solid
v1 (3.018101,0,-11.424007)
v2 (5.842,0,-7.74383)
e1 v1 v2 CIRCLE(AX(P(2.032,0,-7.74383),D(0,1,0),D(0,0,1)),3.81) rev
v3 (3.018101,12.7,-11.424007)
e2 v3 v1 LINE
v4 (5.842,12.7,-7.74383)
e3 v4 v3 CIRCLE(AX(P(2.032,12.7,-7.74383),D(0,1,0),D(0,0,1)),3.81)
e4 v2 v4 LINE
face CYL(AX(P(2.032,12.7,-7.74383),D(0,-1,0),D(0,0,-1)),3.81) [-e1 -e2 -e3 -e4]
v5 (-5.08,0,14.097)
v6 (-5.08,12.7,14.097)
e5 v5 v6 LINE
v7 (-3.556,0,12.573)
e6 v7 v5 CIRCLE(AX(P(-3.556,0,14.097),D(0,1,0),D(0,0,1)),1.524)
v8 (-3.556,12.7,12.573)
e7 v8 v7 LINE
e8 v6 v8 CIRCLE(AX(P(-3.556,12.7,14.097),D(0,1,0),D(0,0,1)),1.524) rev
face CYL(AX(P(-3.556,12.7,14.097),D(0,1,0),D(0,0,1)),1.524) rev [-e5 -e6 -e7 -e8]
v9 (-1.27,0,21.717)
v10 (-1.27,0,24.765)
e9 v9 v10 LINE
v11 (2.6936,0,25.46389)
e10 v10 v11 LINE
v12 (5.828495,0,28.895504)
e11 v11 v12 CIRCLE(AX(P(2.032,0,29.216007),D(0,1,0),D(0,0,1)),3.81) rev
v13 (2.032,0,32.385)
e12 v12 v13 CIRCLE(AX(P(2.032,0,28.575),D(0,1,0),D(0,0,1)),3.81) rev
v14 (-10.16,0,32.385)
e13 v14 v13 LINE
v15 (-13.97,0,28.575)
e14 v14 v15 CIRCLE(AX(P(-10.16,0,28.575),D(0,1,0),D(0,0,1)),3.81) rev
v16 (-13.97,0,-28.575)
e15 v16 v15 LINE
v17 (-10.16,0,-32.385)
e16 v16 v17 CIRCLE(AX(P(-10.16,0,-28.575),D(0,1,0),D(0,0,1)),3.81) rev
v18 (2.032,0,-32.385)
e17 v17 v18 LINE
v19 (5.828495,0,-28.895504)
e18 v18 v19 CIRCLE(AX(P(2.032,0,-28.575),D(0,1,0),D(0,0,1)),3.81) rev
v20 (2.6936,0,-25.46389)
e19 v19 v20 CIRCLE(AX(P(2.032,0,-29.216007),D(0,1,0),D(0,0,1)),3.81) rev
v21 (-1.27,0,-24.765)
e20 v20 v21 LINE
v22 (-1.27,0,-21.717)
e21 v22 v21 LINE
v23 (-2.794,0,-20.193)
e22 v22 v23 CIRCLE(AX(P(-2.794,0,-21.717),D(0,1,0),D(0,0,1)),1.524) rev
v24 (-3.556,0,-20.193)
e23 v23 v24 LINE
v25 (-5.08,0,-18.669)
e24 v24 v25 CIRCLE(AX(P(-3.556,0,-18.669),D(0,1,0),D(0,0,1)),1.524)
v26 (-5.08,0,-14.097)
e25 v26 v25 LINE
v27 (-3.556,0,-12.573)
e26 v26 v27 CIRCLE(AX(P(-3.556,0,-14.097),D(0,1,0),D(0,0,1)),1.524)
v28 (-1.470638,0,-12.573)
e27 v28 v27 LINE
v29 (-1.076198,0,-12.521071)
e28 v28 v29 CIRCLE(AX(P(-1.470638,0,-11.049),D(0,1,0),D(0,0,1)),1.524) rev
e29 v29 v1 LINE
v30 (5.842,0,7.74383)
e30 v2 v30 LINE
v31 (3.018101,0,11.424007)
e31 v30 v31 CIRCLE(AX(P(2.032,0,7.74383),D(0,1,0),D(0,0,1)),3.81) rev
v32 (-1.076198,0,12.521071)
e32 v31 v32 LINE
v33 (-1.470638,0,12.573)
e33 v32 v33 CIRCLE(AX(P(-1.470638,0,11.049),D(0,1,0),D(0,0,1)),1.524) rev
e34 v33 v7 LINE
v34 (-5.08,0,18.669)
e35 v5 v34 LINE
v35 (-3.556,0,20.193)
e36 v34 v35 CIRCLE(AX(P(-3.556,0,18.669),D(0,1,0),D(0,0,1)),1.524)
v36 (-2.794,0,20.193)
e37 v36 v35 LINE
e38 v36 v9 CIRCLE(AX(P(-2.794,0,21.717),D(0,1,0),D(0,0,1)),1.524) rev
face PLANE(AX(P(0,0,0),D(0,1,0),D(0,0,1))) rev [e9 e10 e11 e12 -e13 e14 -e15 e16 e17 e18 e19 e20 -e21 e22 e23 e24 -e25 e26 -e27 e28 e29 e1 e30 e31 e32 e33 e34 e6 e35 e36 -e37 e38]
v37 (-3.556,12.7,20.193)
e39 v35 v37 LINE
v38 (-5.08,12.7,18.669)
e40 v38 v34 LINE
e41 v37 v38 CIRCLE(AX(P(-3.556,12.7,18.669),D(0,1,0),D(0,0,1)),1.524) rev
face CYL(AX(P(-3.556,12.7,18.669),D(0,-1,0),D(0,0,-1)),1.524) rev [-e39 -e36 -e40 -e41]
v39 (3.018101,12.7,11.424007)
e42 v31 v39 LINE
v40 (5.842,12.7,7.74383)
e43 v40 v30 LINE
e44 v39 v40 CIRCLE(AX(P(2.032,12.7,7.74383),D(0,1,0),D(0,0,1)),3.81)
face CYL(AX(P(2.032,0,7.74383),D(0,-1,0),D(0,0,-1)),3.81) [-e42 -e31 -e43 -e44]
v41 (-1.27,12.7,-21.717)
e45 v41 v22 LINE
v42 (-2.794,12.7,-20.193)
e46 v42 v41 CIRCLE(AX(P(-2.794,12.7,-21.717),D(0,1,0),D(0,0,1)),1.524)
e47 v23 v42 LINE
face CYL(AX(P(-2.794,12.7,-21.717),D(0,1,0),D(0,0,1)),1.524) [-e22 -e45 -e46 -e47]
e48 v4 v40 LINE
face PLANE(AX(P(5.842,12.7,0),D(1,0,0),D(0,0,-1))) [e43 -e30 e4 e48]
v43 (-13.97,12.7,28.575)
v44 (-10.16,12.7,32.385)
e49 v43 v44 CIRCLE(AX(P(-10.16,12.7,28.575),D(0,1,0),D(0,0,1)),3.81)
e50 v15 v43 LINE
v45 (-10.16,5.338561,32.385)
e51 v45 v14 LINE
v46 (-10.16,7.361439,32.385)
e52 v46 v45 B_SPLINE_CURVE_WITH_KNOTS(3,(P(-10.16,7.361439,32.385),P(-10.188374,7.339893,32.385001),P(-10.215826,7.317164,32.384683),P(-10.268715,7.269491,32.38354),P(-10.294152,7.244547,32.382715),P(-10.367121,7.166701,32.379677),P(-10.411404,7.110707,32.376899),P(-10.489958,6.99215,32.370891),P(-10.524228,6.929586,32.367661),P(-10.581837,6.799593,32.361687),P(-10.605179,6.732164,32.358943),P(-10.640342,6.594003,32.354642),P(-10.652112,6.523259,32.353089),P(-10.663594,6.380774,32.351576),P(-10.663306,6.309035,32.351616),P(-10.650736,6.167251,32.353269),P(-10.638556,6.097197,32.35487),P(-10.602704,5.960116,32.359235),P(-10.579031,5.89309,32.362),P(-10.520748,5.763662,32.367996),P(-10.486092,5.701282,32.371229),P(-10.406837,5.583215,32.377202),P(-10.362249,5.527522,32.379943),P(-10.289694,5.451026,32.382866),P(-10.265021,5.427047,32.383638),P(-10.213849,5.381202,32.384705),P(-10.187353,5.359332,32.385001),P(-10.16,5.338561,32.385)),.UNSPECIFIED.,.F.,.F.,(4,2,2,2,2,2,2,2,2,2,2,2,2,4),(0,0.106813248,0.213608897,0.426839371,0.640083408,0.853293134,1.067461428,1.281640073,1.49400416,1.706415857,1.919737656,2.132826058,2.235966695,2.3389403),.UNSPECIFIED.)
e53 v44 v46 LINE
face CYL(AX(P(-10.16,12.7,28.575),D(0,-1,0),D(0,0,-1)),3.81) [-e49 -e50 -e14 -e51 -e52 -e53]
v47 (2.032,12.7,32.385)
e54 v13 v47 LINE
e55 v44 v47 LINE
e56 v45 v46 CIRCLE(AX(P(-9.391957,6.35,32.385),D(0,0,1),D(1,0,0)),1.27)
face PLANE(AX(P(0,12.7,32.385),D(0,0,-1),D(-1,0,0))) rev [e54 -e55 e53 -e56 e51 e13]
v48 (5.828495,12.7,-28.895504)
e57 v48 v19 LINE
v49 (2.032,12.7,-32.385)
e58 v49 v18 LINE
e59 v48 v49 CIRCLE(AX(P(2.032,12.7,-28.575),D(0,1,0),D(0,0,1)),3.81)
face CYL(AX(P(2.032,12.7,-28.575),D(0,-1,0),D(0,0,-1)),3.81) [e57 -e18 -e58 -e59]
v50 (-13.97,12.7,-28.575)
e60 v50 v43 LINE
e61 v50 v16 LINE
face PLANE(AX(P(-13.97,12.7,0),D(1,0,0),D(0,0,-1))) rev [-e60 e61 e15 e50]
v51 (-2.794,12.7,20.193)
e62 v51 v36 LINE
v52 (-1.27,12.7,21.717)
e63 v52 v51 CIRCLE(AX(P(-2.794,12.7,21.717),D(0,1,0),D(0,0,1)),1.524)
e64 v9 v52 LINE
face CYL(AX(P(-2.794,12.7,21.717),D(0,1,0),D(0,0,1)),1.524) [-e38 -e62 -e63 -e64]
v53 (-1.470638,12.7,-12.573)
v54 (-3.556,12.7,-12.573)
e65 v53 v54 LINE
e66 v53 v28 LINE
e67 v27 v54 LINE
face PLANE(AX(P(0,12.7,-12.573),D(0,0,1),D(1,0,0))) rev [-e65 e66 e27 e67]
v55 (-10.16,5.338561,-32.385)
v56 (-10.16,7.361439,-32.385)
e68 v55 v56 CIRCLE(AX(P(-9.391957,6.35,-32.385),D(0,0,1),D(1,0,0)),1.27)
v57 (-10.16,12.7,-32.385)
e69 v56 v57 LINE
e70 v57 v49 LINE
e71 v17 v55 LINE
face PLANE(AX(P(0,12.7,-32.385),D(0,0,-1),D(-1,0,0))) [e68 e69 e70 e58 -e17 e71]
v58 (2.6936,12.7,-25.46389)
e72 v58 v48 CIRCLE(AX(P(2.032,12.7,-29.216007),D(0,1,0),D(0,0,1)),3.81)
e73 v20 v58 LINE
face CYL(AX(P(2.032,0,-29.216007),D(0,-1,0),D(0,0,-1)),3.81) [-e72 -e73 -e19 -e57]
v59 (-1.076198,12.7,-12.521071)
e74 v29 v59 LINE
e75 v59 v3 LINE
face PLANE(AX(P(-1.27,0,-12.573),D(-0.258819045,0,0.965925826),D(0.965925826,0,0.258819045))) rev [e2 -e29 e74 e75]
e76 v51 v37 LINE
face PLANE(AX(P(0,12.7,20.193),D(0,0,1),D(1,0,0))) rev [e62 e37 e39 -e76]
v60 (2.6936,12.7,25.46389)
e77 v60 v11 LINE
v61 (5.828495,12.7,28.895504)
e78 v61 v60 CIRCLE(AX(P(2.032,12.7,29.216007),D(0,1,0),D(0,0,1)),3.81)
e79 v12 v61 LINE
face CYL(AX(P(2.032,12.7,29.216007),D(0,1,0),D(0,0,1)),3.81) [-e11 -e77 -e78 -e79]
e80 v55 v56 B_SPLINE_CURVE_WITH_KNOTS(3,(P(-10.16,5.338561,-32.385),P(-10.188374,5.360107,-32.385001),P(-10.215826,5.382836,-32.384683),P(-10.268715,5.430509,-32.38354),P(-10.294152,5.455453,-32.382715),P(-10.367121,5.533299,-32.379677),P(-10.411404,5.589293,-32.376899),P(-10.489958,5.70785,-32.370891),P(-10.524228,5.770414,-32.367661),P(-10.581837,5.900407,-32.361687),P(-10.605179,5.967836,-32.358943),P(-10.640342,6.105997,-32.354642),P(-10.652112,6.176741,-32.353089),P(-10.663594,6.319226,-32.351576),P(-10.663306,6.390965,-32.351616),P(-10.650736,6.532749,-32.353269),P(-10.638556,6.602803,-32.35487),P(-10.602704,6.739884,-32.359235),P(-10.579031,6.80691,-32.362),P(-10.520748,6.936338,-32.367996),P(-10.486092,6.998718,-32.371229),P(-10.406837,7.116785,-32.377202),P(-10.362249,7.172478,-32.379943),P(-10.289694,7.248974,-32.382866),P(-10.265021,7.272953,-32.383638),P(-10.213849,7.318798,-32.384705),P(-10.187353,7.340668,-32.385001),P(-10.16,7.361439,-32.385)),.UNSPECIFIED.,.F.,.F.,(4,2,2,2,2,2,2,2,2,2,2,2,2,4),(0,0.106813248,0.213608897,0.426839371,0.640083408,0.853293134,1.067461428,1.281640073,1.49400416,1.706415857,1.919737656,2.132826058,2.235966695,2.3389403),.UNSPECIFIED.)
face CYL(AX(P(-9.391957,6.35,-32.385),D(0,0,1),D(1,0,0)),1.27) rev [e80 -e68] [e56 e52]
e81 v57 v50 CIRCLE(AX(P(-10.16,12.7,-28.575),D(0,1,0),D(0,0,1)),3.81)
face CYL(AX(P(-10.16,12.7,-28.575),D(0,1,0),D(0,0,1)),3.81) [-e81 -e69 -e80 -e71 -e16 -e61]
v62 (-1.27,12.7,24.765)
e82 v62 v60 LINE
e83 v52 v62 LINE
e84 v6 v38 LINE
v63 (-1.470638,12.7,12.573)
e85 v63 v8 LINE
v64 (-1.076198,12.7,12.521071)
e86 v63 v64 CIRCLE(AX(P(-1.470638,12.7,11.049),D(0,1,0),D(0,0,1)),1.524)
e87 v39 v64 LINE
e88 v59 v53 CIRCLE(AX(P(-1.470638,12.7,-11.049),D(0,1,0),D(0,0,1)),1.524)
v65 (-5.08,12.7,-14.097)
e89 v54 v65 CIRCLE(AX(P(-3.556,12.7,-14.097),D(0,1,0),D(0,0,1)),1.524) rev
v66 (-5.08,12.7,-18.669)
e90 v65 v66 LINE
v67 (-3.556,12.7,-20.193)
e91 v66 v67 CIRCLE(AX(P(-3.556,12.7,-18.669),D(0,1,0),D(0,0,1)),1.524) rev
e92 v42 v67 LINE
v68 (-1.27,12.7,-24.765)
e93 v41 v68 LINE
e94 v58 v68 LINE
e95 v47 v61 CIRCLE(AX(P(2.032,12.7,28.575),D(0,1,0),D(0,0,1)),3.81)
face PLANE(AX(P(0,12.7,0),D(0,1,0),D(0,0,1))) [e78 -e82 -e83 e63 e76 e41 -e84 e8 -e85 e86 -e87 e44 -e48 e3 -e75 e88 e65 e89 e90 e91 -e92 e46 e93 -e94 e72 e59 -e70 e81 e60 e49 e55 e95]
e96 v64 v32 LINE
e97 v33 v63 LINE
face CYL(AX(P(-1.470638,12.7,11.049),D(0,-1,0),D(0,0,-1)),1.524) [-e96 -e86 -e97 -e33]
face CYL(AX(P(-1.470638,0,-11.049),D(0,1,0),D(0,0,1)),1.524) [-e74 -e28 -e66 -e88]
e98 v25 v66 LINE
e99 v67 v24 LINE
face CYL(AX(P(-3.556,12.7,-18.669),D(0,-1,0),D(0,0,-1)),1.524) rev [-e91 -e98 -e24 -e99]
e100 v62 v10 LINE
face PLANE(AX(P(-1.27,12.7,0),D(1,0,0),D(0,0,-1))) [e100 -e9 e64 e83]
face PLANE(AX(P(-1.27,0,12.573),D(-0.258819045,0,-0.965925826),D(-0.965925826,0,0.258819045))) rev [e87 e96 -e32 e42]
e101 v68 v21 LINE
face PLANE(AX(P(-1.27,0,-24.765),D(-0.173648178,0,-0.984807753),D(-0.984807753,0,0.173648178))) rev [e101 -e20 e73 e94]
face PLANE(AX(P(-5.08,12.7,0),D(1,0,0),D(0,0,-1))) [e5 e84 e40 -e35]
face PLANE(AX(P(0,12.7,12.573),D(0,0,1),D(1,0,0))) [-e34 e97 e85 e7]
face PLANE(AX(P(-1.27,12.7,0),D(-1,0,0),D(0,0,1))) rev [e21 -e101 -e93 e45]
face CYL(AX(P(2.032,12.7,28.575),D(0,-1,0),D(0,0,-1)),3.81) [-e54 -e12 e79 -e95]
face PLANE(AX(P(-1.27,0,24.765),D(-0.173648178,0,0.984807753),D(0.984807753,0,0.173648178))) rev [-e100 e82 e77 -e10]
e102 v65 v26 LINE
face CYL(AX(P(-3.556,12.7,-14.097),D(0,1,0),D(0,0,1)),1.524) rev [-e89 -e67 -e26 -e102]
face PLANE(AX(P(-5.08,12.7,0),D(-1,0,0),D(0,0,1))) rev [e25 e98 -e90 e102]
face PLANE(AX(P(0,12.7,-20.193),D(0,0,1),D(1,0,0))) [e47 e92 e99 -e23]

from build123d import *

# Parameters (mm, degrees)
BOSS_EXTRUDE1_DEPTH = 12.7
CUT_EXTRUDE1_DEPTH  = 38.486519244
FILLET4_R           = 1.524
FILLET5_R           = 3.81
SKETCH3_R           = 1.27
CUT_EXTRUDE2_DEPTH  = 68.465574925


with BuildPart() as part:
    # Sketch1 → Boss-Extrude1 (new body)
    with BuildSketch(Plane(origin=(0, 0, 0), x_dir=(1, 0, 0), z_dir=(0, 1, 0))):
        Polygon((5.842, 32.385), (-13.97, 32.385), (-13.97, -32.385), (5.842, -32.385), (5.842, -24.765), (-1.27, -24.765), (-1.27, -20.193), (-5.08, -20.193), (-5.08, -12.573), (-1.27, -12.573), (5.842, -12.573), (5.842, 12.573), (-1.27, 12.573), (-5.08, 12.573), (-5.08, 20.193), (-1.27, 20.193), (-1.27, 24.765), (5.842, 24.765), align=None)
    extrude(amount=BOSS_EXTRUDE1_DEPTH)

    # Sketch2 → Cut-Extrude1 (cut, through all)
    with BuildSketch(Plane(origin=(0, 12.7, 0), x_dir=(1, 0, 0), z_dir=(0, 1, 0))):
        Polygon((-1.27, 24.765), (5.842, 26.019037487), (5.842, 24.765), align=None)
        Polygon((-1.27, -24.765), (5.842, -26.019037487), (5.842, -24.765), align=None)
        Polygon((-1.27, -12.573), (5.842, -10.667345343), (5.842, -12.573), align=None)
        Polygon((-1.27, 12.573), (5.842, 10.667345343), (5.842, 12.573), align=None)
    extrude(amount=-CUT_EXTRUDE1_DEPTH, mode=Mode.SUBTRACT)

    # Fillet4
    fillet4_edges = [part.edges().sort_by_distance(p)[0] for p in [
        (-5.08, 6.35, 20.193),
        (-1.27, 6.35, 20.193),
        (-1.27, 6.35, -20.193),
        (-5.08, 6.35, -20.193),
        (-5.08, 6.35, -12.573),
        (-5.08, 6.35, 12.573),
        (-1.27, 6.35, 12.573),
        (-1.27, 6.35, -12.573),
    ]]
    fillet(fillet4_edges, radius=FILLET4_R)

    # Fillet5
    # the kernel refuses this fillet: 3.81 mm, written as the material it takes off along each edge
    with BuildSketch(Plane(origin=(5.842, -9.525, 32.385), x_dir=(-1, 0, 0), z_dir=(0, 1, 0)), Plane(origin=(-13.97, -9.525, 32.385), x_dir=(0, 0, -1), z_dir=(0, 1, 0)), Plane(origin=(-13.97, -9.525, -32.385), x_dir=(1, 0, 0), z_dir=(0, 1, 0)), Plane(origin=(5.842, -9.525, -32.385), x_dir=(0, 0, 1), z_dir=(0, 1, 0))) as fillet5_piece_1:
        with BuildLine():
            CenterArc((FILLET5_R, -FILLET5_R), FILLET5_R, 90, 90)
            Line((0, -FILLET5_R), (0, 0))
            Line((0, 0), (FILLET5_R, 0))
        make_face()
    extrude(amount=31.75, mode=Mode.SUBTRACT)
    with BuildSketch(Plane(origin=(5.842, 20.692423987, -26.019037487), x_dir=(-0.9848077530122095, 0, 0.17364817766692292), z_dir=(0, -1, 0)), Plane(origin=(5.842, 20.692423987, 26.019037487), x_dir=(0, 0, 1), z_dir=(0, -1, 0))) as fillet5_piece_2:
        with BuildLine():
            CenterArc((FILLET5_R * 0.839099631177, FILLET5_R), FILLET5_R, 190, 80)
            Line((-FILLET5_R * 0.145708121835, FILLET5_R * 0.826351822333), (0, 0))
            Line((0, 0), (FILLET5_R * 0.839099631177, 0))
        make_face()
    extrude(amount=28.684847974, mode=Mode.SUBTRACT)
    with BuildSketch(Plane(origin=(5.842, 20.00878956, 10.667345343), x_dir=(0, 0, -1), z_dir=(0, -1, 0)), Plane(origin=(5.842, 20.00878956, -10.667345343), x_dir=(-0.9659258262890701, 0, -0.258819045102514), z_dir=(0, -1, 0))) as fillet5_piece_3:
        with BuildLine():
            CenterArc((FILLET5_R * 0.767326987979, -FILLET5_R), FILLET5_R, 90, 75)
            Line((-FILLET5_R * 0.19859883831, -FILLET5_R * 0.741180954897), (0, 0))
            Line((0, 0), (FILLET5_R * 0.767326987979, 0))
        make_face()
    extrude(amount=27.317579121, mode=Mode.SUBTRACT)

    # Sketch3 → Cut-Extrude2 (cut, through all)
    with BuildSketch(Plane.XY.offset(32.385)):
        with Locations(Location((-9.391956596, 6.35, 0), (0, 0, 127.211471896))):
            Circle(SKETCH3_R)
    extrude(amount=-CUT_EXTRUDE2_DEPTH, mode=Mode.SUBTRACT)


solid = part.part
